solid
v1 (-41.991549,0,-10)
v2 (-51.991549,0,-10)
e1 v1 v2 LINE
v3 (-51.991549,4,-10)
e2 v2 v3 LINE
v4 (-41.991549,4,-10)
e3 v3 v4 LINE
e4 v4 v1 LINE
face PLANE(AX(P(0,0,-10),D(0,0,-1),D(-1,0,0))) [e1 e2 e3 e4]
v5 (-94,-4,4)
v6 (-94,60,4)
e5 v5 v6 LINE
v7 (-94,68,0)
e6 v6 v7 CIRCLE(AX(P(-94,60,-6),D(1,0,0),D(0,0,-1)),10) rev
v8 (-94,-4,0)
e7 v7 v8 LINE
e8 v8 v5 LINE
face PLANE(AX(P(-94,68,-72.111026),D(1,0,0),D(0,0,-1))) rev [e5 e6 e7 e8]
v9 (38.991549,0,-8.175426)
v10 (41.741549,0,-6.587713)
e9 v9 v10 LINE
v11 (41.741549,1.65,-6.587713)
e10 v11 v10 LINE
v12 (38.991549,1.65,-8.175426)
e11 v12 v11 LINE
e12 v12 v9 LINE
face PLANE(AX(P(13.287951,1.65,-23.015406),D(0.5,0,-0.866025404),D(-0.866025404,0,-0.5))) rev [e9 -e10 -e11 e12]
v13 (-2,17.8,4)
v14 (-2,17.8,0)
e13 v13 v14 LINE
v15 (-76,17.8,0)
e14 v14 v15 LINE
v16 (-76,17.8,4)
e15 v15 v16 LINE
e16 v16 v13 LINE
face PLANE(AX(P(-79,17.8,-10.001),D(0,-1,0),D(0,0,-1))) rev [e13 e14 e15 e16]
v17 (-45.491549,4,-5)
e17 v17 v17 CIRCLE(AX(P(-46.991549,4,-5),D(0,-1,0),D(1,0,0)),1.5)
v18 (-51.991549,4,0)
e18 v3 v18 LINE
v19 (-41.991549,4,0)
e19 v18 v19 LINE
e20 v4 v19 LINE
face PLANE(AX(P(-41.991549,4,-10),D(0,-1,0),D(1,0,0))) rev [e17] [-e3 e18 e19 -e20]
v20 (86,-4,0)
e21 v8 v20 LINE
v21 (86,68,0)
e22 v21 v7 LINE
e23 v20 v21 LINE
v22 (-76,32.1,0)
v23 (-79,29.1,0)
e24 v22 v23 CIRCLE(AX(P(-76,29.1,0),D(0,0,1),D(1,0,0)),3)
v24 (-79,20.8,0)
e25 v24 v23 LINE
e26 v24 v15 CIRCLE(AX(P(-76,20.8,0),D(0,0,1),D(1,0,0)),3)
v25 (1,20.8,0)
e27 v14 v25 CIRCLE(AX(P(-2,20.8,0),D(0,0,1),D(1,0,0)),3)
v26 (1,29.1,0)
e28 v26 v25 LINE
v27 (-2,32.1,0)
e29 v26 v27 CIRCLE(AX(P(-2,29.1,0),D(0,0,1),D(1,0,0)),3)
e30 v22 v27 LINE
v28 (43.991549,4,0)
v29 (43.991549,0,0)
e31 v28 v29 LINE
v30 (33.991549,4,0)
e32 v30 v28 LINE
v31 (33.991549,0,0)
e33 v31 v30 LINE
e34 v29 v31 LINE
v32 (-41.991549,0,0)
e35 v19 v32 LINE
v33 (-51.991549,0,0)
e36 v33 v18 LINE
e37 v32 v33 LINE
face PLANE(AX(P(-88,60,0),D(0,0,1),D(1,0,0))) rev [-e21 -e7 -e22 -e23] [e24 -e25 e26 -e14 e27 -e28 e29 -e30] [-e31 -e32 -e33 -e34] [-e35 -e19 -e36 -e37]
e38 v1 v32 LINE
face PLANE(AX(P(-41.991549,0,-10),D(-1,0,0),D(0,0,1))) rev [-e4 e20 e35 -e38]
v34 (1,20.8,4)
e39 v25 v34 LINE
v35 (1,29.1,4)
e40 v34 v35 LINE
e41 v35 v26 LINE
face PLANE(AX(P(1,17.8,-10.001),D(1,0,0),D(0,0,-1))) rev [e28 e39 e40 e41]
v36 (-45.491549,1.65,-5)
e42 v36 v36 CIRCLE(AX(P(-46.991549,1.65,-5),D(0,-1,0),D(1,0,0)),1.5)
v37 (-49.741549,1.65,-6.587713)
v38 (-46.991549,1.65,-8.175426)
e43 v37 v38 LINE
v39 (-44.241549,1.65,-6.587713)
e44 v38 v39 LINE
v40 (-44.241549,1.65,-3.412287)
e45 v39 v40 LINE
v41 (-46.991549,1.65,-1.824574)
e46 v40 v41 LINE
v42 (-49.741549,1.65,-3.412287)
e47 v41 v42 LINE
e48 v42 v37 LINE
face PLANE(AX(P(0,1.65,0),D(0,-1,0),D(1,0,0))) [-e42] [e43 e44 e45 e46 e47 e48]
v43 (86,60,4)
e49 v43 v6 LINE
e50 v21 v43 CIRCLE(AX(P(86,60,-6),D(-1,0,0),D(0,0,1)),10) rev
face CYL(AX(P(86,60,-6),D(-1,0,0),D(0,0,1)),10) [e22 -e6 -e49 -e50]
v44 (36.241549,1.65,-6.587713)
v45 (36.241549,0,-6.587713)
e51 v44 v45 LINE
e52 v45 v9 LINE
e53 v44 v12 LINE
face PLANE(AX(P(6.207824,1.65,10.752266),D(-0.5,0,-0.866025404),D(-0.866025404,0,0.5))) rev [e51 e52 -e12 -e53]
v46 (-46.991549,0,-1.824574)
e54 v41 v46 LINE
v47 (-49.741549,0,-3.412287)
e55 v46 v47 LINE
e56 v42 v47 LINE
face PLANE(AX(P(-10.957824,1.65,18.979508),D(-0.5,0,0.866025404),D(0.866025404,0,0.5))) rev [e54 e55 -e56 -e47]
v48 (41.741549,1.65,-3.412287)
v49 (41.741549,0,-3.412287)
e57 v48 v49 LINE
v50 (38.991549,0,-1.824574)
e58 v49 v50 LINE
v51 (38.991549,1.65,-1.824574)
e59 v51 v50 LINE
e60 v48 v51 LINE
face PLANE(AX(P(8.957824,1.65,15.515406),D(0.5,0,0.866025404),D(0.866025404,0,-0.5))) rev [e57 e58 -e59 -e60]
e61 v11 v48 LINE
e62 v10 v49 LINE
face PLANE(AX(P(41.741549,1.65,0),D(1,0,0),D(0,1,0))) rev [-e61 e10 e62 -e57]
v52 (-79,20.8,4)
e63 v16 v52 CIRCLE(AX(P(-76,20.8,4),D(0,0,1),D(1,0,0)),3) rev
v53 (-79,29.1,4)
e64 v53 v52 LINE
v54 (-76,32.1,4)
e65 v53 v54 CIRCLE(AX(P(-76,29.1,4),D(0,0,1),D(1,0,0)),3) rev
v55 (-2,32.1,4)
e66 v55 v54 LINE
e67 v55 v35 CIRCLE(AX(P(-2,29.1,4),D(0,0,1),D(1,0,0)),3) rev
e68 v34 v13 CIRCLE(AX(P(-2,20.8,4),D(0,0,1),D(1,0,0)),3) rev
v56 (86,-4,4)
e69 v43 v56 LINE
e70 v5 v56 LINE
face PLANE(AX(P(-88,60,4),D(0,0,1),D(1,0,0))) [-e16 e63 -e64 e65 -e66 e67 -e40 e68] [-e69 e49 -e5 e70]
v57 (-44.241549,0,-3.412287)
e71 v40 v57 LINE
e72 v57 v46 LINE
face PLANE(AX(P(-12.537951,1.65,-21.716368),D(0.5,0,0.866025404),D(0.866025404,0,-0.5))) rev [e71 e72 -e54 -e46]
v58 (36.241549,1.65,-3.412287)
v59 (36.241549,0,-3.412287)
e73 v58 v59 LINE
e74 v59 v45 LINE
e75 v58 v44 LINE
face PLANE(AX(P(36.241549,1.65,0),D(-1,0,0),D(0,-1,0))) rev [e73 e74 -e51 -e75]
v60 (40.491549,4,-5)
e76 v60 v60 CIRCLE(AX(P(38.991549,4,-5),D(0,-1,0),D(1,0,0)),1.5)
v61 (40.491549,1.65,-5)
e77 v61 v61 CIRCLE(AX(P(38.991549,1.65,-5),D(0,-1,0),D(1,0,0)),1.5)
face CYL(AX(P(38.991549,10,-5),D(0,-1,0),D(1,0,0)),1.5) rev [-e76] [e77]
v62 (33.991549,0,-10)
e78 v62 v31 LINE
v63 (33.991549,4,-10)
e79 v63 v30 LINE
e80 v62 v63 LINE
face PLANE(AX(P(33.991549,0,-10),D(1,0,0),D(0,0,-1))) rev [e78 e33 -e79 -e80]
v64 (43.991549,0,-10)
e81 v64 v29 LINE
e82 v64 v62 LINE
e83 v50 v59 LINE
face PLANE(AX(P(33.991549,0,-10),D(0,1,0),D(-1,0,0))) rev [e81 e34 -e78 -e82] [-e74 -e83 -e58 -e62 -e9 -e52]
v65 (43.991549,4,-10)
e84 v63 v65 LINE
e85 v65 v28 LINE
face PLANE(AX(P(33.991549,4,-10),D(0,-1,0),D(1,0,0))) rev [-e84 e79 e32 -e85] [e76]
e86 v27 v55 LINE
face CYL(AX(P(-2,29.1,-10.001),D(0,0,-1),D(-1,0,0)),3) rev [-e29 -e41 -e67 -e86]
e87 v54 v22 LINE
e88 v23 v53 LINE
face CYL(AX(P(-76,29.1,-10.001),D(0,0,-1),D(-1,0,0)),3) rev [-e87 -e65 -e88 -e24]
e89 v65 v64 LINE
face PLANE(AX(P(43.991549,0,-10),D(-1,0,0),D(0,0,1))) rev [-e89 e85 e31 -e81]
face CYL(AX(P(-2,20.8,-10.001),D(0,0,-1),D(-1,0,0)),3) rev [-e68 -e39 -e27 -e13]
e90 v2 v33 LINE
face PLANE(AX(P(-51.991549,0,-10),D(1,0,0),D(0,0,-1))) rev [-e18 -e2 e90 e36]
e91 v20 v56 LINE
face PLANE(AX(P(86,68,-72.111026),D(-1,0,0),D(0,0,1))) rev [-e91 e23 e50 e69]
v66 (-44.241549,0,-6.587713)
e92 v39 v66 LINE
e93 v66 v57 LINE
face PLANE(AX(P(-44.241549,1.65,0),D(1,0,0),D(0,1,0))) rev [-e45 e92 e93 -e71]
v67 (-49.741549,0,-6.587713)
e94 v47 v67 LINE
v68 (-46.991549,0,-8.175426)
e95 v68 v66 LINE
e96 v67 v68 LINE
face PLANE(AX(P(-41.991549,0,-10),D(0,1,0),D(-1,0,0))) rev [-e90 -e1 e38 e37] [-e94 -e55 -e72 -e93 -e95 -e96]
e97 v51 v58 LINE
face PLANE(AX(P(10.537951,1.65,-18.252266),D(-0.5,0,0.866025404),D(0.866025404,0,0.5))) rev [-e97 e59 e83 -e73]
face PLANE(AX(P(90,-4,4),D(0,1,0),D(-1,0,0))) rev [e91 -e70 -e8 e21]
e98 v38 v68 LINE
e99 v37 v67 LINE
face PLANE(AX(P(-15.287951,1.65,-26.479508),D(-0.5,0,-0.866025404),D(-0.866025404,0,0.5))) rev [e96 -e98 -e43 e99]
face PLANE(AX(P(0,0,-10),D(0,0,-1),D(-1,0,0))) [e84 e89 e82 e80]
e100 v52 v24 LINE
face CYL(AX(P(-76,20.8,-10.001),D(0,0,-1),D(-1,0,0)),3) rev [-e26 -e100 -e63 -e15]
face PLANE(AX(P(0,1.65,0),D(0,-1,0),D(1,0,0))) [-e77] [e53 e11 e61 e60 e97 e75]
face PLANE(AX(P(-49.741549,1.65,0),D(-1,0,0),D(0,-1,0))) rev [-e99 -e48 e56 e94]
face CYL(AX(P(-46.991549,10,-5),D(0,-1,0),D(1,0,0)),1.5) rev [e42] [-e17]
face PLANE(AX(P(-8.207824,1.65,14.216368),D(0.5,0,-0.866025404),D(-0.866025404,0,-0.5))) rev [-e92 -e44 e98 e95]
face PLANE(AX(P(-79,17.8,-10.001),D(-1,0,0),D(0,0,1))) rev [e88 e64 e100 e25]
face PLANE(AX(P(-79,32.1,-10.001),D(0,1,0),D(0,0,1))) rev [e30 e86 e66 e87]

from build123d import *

# Parameters (mm, degrees)
SALIENTE_EXTRUIR1_DEPTH = 4
CROQUIS2_W              = 10
CROQUIS2_H              = 4
SALIENTE_EXTRUIR2_DEPTH = 10
CROQUIS3_R              = 1.5
CORTAR_EXTRUIR1_DEPTH   = 10
CROQUIS3_3_R            = 1.5
CORTAR_EXTRUIR2_DEPTH   = 1.65
REDONDEO2_R             = 10
CROQUIS4_W              = 4
CROQUIS4_H              = 72
CORTAR_EXTRUIR3_DEPTH   = 4
CORTAR_EXTRUIR4_REACH   = 118.859
CROQUIS5_W              = 80
CROQUIS5_H              = 14.3
REDONDEO3_R             = 3


with BuildPart() as part:
    # Croquis1 → Saliente-Extruir1 (new body)
    with BuildSketch(Plane.XY):
        with BuildLine():
            Line((-98, 60), (-98, -4))
            Line((-98, -4), (90, -4))
            Line((90, -4), (90, 60))
            ThreePointArc((90, 60), (88.94427191, 64.472135955), (86, 68))
            Line((86, 68), (-94, 68))
            ThreePointArc((-94, 68), (-96.94427191, 64.472135955), (-98, 60))
        make_face()
    extrude(amount=SALIENTE_EXTRUIR1_DEPTH)

    # Croquis2 → Saliente-Extruir2 (add)
    with BuildSketch(Plane(origin=(0, 0, 0), x_dir=(-1, 0, 0), z_dir=(0, 0, -1))):
        with Locations((46.991549296, 2)):
            Rectangle(CROQUIS2_W, CROQUIS2_H)
        with Locations((-38.991549296, 2)):
            Rectangle(CROQUIS2_W, CROQUIS2_H)
    extrude(amount=SALIENTE_EXTRUIR2_DEPTH)

    # Croquis3 → Cortar-Extruir1 (cut)
    with BuildSketch(Plane.XZ):
        with Locations((38.991549296, -5)):
            Circle(CROQUIS3_R)
        with Locations((-46.991549296, -5)):
            Circle(CROQUIS3_R)
    extrude(amount=-CORTAR_EXTRUIR1_DEPTH, mode=Mode.SUBTRACT)

    # Croquis3<3> → Cortar-Extruir2 (cut)
    # profile 1 of 2: a face of its own
    with BuildSketch(Plane.XZ):
        Polygon((-46.991549296, -8.175426481), (-44.241549296, -6.58771324), (-44.241549296, -3.41228676), (-46.991549296, -1.824573519), (-49.741549296, -3.41228676), (-49.741549296, -6.58771324), align=None)
        with Locations((-46.991549296, -5)):
            Circle(CROQUIS3_3_R, mode=Mode.SUBTRACT)
    # profile 2 of 2: a face of its own
    with BuildSketch(Plane.XZ):
        Polygon((38.991549296, -8.175426481), (41.741549296, -6.58771324), (41.741549296, -3.41228676), (38.991549296, -1.824573519), (36.241549296, -3.41228676), (36.241549296, -6.58771324), align=None)
        with Locations((38.991549296, -5)):
            Circle(CROQUIS3_3_R, mode=Mode.SUBTRACT)
    extrude(amount=-CORTAR_EXTRUIR2_DEPTH, mode=Mode.SUBTRACT)

    # Redondeo2
    # the kernel refuses this fillet: 10 mm, written as the material it takes off along each edge
    with BuildSketch(Plane(origin=(106, 68, 4), x_dir=(0, -1, 0), z_dir=(-1, 0, 0))) as redondeo2_piece_1:
        with BuildLine():
            CenterArc((8, -10), REDONDEO2_R, 90, 53.130102354)
            Line((0, -4), (-0.16, -3.88))
            ThreePointArc((-0.16, -3.88), (-0.2, -2), (-0.2, 0))
            Line((-0.2, 0), (0, 0.2))
            Line((0, 0.2), (8, 0.2))
            Line((8, 0.2), (8, 0))
        make_face()
    extrude(amount=220, mode=Mode.SUBTRACT)

    # Croquis4 → Cortar-Extruir3 (cut)
    with BuildSketch(Plane.XY.offset(4)):
        with Locations((88, 32)):
            Rectangle(CROQUIS4_W, CROQUIS4_H)
        with Locations((-96, 32)):
            Rectangle(CROQUIS4_W, CROQUIS4_H)
    extrude(amount=-CORTAR_EXTRUIR3_DEPTH, mode=Mode.SUBTRACT)

    # Croquis5 → Cortar-Extruir4 (cut, up to next)
    with BuildSketch(Plane.XY.offset(4), mode=Mode.PRIVATE) as cortar_extruir4_sk1:
        with Locations((-39, 24.95)):
            Rectangle(CROQUIS5_W, CROQUIS5_H)
    cortar_extruir4_tool1 = extrude(cortar_extruir4_sk1.sketch, amount=-CORTAR_EXTRUIR4_REACH, mode=Mode.PRIVATE) & part.part
    add(cortar_extruir4_tool1.solids().sort_by_distance((-39, 24.95, 4))[0], mode=Mode.SUBTRACT)

    # Redondeo3
    redondeo3_edges = [part.edges().sort_by_distance(p)[0] for p in [
        (-79, 17.8, 2),
        (-79, 32.1, 2),
        (1, 32.1, 2),
        (1, 17.8, 2),
    ]]
    fillet(redondeo3_edges, radius=REDONDEO3_R)


solid = part.part
